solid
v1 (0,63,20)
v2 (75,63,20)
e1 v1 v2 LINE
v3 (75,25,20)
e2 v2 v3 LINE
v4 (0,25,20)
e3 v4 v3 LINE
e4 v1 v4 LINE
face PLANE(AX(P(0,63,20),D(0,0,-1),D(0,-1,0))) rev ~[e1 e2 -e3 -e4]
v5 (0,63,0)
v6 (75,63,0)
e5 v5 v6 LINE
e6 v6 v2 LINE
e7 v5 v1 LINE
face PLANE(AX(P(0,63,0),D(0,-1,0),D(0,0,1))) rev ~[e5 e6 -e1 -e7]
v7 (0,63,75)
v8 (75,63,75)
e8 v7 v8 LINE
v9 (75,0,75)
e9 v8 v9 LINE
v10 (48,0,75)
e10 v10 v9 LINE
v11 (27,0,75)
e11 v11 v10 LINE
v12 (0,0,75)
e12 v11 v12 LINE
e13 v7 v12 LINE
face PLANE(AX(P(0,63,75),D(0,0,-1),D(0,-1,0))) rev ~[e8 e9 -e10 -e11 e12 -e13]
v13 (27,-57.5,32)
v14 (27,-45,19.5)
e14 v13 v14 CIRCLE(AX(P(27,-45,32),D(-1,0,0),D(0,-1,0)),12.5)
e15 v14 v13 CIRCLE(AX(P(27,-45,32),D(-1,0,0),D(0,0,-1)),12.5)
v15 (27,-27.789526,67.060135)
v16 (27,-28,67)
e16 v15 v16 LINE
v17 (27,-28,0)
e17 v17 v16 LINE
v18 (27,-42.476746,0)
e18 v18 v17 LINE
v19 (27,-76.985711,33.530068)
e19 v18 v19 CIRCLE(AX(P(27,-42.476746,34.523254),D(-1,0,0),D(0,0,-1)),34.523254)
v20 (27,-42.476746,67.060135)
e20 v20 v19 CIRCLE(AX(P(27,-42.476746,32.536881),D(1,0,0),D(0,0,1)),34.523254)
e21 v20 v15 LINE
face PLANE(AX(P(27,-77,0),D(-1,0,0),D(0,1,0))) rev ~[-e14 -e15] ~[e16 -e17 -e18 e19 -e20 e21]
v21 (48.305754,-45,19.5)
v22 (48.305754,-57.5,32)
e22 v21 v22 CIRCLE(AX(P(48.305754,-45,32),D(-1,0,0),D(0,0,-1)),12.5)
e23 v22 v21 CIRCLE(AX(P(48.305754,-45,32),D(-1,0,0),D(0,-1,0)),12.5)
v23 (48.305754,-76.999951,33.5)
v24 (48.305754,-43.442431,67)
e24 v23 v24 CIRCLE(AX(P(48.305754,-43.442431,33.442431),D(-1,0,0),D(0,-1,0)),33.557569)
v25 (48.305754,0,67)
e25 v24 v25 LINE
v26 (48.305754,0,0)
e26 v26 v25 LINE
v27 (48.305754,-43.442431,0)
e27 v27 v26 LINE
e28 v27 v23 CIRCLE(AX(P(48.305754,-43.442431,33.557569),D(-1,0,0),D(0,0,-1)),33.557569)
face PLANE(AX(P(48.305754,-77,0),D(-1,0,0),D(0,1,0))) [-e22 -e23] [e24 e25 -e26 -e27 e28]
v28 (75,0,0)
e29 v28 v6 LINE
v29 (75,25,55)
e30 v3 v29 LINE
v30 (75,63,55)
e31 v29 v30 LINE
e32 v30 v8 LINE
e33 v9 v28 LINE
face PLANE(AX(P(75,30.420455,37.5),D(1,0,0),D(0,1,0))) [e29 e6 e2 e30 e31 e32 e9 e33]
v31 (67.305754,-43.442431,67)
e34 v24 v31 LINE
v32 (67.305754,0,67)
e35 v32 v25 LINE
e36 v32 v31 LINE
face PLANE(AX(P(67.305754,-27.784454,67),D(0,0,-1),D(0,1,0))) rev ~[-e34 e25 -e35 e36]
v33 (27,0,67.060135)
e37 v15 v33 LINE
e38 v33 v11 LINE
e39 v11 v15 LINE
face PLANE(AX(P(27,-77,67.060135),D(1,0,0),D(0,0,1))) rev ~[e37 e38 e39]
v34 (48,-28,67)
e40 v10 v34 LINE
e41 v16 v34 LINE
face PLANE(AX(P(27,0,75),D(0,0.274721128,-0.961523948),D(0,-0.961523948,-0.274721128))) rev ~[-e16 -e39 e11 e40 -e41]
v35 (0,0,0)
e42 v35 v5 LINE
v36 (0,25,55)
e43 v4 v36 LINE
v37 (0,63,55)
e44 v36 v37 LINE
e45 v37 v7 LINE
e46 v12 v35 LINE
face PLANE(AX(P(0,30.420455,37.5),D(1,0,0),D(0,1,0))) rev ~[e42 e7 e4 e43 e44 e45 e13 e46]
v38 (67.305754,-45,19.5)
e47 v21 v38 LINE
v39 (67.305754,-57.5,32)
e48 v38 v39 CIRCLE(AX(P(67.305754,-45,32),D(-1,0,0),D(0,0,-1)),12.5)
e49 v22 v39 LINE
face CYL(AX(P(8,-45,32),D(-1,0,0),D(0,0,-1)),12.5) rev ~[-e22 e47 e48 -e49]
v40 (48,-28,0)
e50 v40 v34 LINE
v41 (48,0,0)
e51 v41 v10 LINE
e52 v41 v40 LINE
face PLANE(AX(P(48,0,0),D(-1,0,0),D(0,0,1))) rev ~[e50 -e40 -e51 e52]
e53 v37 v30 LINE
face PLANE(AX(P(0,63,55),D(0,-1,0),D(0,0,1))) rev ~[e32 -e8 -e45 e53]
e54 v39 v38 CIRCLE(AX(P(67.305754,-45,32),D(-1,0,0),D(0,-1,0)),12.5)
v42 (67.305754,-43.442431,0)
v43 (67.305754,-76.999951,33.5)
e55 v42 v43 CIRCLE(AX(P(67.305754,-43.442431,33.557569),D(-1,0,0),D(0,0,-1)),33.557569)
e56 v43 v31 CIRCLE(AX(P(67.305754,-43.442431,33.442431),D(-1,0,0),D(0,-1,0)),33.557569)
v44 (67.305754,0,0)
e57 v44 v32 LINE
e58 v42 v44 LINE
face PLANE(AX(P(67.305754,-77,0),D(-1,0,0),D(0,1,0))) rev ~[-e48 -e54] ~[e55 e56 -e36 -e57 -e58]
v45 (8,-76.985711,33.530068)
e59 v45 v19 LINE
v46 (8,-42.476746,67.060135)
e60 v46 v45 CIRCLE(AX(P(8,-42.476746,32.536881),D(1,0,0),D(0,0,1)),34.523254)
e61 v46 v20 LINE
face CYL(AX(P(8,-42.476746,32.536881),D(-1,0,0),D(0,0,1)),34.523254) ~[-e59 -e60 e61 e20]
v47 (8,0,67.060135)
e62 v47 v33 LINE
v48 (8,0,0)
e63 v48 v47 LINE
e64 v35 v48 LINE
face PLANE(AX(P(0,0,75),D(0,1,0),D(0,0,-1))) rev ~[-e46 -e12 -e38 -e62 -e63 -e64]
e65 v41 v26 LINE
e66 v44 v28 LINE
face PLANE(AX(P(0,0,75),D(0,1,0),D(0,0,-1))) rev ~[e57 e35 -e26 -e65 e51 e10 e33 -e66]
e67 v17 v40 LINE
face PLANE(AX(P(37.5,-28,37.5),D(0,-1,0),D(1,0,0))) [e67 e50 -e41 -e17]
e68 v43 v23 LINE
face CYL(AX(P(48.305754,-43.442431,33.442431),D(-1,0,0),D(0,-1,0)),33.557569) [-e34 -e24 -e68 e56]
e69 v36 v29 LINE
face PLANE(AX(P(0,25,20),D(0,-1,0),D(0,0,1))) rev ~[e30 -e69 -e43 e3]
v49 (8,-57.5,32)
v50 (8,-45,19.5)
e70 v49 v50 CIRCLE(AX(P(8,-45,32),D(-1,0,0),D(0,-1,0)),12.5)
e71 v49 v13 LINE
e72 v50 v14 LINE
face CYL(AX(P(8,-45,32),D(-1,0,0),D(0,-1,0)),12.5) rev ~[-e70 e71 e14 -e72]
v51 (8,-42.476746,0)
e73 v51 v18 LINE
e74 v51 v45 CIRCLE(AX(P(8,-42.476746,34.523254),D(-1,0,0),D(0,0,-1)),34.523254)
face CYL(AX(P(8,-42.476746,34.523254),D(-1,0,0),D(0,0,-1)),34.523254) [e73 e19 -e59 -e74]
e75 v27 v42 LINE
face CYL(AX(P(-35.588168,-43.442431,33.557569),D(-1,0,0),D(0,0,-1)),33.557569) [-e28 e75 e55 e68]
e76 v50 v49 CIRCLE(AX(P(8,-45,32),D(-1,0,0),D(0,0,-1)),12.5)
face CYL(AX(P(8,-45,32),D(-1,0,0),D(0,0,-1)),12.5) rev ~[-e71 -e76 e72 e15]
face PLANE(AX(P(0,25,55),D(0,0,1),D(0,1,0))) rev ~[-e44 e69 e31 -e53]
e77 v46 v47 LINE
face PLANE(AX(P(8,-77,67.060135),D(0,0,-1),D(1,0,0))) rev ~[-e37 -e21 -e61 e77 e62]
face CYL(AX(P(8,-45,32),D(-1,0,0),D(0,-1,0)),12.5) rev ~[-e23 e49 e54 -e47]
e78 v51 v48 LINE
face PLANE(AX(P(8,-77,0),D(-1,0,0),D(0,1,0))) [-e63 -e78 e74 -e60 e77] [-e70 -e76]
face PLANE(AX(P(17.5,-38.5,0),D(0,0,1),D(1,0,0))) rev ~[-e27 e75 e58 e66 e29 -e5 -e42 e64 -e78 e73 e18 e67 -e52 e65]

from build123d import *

# Parameters (mm, degrees)
F1_DEPTH     = 75
F2_W         = 21
F2_H         = 75
F3_DEPTH     = 28
F5_DEPTH     = 50.8
F6_W         = 19
F6_H         = 77
F7_DEPTH     = 75
F9_DEPTH     = 38.6
F11_DEPTH    = 19
F12_W        = 19
F12_H        = 77
F13_DEPTH    = 77
F14_W        = 19
F14_H        = 9.9398646951
F15_DEPTH    = 77
F17_DEPTH    = 75.4
F18_T1_DEPTH = 19
F19_T1_DEPTH = 102.8939212925
F19_T3_DEPTH = 186.7878425849


# Not quite as in the source:
# - a fillet or chamfer that OpenCascade refuses, or shapes differently, is made with other operations: its cross-section is extruded or revolved along the edge and cut away or added


with BuildPart() as f1:
    # F0 (on Right) → F1 (new body)
    with BuildSketch(Plane.YZ):
        Polygon((0, 75), (0, 0), (63, 0), (63, 20), (25, 20), (25, 55), (63, 55), (63, 75), align=None)
    extrude(amount=F1_DEPTH)

    # F2 (on face) → F3 (join)
    with BuildSketch(Plane.XZ):
        with Locations((37.5, 37.5)):
            Rectangle(F2_W, F2_H)
    extrude(amount=F3_DEPTH)

    # F4 (on face) → F5 (cut)
    with BuildSketch(Plane(origin=(27, 0, 0), x_dir=(0, -1, 0), z_dir=(-1, 0, 0))):
        Polygon((28, 67), (28, 75), (0, 75), align=None)
    extrude(amount=-F5_DEPTH, mode=Mode.SUBTRACT)

    # F6 (on Top) → F7 (join)
    with BuildSketch(Plane.XY):
        with Locations((57.8057536185, -38.5)):
            Rectangle(F6_W, F6_H)
    extrude(amount=F7_DEPTH)

    # F8 (on face) → F9 (cut)
    with BuildSketch(Plane(origin=(48.3057536185, 0, 0), x_dir=(0, -1, 0), z_dir=(-1, 0, 0))):
        Polygon((77, 75), (0, 75), (27.784453705, 67), (77, 67), align=None)
    extrude(amount=-F9_DEPTH, mode=Mode.SUBTRACT)

    # F10 (on face) → F11 (cut)
    with BuildSketch(Plane.YZ.offset(67.3057536185)):
        Polygon((0, 75), (-27.784453705, 67), (0, 67), align=None)
    extrude(amount=-F11_DEPTH, mode=Mode.SUBTRACT)

    # F12 (on Top) → F13 (join)
    with BuildSketch(Plane.XY):
        with Locations((17.5, -38.5)):
            Rectangle(F12_W, F12_H)
    extrude(amount=F13_DEPTH)

    # F14 (on face) → F15 (cut)
    with BuildSketch(Plane.XZ.offset(77)):
        with Locations((17.5, 72.0300676525)):
            Rectangle(F14_W, F14_H)
    extrude(amount=-F15_DEPTH, mode=Mode.SUBTRACT)

    # F16 (on face) → F17 (cut)
    with BuildSketch(Plane(origin=(8, 0, 0), x_dir=(0, -1, 0), z_dir=(-1, 0, 0))):
        with BuildLine():
            ThreePointArc((57.5, 32), (36.1611652352, 40.8388347648), (45, 19.5))
            ThreePointArc((45, 19.5), (53.8388347648, 23.1611652352), (57.5, 32))
        make_face()
    extrude(amount=-F17_DEPTH, mode=Mode.SUBTRACT)

    # F18: fillet of radius 34.5232539419 on 2 edges, made by hand

    # F18_s2 → F18_t1 (cut)
    with BuildSketch(Plane.YZ.offset(8)):
        with BuildLine():
            ThreePointArc((-42.4767460581, 67.0601353049), (-66.888373029, 56.948508334), (-77, 32.536881363))
            Line((-77, 32.536881363), (-77.6904650788, 32.536881363))
            Line((-77.6904650788, 32.536881363), (-77.6904650788, 67.7506003838))
            Line((-77.6904650788, 67.7506003838), (-42.4767460581, 67.7506003838))
            Line((-42.4767460581, 67.7506003838), (-42.4767460581, 67.0601353049))
        make_face()
        with BuildLine():
            ThreePointArc((-42.4767460581, 0), (-66.888373029, 10.111626971), (-77, 34.5232539419))
            Line((-77, 34.5232539419), (-77.6904650788, 34.5232539419))
            Line((-77.6904650788, 34.5232539419), (-77.6904650788, -0.6904650788))
            Line((-77.6904650788, -0.6904650788), (-42.4767460581, -0.6904650788))
            Line((-42.4767460581, -0.6904650788), (-42.4767460581, 0))
        make_face()
    extrude(amount=F18_T1_DEPTH, mode=Mode.SUBTRACT)

    # F19: fillet of radius 33.557568517 on 2 edges, made by hand

    # F19_s2 → F19_t1 (cut)
    with BuildSketch(Plane.YZ.offset(48.3057536185)):
        with BuildLine():
            ThreePointArc((-77, 33.442431483), (-67.1712157415, 57.1712157415), (-43.442431483, 67))
            Line((-43.442431483, 67), (-77, 67))
            Line((-77, 67), (-77, 33.442431483))
        make_face()
    extrude(amount=F19_T1_DEPTH, mode=Mode.SUBTRACT)

    # F19_s4 → F19_t3 (cut)
    with BuildSketch(Plane.YZ.offset(-35.588167674)):
        with BuildLine():
            ThreePointArc((-43.442431483, 0), (-67.1712157415, 9.8287842585), (-77, 33.557568517))
            Line((-77, 33.557568517), (-77, 0))
            Line((-77, 0), (-43.442431483, 0))
        make_face()
    extrude(amount=F19_T3_DEPTH, mode=Mode.SUBTRACT)


solid = f1.part
